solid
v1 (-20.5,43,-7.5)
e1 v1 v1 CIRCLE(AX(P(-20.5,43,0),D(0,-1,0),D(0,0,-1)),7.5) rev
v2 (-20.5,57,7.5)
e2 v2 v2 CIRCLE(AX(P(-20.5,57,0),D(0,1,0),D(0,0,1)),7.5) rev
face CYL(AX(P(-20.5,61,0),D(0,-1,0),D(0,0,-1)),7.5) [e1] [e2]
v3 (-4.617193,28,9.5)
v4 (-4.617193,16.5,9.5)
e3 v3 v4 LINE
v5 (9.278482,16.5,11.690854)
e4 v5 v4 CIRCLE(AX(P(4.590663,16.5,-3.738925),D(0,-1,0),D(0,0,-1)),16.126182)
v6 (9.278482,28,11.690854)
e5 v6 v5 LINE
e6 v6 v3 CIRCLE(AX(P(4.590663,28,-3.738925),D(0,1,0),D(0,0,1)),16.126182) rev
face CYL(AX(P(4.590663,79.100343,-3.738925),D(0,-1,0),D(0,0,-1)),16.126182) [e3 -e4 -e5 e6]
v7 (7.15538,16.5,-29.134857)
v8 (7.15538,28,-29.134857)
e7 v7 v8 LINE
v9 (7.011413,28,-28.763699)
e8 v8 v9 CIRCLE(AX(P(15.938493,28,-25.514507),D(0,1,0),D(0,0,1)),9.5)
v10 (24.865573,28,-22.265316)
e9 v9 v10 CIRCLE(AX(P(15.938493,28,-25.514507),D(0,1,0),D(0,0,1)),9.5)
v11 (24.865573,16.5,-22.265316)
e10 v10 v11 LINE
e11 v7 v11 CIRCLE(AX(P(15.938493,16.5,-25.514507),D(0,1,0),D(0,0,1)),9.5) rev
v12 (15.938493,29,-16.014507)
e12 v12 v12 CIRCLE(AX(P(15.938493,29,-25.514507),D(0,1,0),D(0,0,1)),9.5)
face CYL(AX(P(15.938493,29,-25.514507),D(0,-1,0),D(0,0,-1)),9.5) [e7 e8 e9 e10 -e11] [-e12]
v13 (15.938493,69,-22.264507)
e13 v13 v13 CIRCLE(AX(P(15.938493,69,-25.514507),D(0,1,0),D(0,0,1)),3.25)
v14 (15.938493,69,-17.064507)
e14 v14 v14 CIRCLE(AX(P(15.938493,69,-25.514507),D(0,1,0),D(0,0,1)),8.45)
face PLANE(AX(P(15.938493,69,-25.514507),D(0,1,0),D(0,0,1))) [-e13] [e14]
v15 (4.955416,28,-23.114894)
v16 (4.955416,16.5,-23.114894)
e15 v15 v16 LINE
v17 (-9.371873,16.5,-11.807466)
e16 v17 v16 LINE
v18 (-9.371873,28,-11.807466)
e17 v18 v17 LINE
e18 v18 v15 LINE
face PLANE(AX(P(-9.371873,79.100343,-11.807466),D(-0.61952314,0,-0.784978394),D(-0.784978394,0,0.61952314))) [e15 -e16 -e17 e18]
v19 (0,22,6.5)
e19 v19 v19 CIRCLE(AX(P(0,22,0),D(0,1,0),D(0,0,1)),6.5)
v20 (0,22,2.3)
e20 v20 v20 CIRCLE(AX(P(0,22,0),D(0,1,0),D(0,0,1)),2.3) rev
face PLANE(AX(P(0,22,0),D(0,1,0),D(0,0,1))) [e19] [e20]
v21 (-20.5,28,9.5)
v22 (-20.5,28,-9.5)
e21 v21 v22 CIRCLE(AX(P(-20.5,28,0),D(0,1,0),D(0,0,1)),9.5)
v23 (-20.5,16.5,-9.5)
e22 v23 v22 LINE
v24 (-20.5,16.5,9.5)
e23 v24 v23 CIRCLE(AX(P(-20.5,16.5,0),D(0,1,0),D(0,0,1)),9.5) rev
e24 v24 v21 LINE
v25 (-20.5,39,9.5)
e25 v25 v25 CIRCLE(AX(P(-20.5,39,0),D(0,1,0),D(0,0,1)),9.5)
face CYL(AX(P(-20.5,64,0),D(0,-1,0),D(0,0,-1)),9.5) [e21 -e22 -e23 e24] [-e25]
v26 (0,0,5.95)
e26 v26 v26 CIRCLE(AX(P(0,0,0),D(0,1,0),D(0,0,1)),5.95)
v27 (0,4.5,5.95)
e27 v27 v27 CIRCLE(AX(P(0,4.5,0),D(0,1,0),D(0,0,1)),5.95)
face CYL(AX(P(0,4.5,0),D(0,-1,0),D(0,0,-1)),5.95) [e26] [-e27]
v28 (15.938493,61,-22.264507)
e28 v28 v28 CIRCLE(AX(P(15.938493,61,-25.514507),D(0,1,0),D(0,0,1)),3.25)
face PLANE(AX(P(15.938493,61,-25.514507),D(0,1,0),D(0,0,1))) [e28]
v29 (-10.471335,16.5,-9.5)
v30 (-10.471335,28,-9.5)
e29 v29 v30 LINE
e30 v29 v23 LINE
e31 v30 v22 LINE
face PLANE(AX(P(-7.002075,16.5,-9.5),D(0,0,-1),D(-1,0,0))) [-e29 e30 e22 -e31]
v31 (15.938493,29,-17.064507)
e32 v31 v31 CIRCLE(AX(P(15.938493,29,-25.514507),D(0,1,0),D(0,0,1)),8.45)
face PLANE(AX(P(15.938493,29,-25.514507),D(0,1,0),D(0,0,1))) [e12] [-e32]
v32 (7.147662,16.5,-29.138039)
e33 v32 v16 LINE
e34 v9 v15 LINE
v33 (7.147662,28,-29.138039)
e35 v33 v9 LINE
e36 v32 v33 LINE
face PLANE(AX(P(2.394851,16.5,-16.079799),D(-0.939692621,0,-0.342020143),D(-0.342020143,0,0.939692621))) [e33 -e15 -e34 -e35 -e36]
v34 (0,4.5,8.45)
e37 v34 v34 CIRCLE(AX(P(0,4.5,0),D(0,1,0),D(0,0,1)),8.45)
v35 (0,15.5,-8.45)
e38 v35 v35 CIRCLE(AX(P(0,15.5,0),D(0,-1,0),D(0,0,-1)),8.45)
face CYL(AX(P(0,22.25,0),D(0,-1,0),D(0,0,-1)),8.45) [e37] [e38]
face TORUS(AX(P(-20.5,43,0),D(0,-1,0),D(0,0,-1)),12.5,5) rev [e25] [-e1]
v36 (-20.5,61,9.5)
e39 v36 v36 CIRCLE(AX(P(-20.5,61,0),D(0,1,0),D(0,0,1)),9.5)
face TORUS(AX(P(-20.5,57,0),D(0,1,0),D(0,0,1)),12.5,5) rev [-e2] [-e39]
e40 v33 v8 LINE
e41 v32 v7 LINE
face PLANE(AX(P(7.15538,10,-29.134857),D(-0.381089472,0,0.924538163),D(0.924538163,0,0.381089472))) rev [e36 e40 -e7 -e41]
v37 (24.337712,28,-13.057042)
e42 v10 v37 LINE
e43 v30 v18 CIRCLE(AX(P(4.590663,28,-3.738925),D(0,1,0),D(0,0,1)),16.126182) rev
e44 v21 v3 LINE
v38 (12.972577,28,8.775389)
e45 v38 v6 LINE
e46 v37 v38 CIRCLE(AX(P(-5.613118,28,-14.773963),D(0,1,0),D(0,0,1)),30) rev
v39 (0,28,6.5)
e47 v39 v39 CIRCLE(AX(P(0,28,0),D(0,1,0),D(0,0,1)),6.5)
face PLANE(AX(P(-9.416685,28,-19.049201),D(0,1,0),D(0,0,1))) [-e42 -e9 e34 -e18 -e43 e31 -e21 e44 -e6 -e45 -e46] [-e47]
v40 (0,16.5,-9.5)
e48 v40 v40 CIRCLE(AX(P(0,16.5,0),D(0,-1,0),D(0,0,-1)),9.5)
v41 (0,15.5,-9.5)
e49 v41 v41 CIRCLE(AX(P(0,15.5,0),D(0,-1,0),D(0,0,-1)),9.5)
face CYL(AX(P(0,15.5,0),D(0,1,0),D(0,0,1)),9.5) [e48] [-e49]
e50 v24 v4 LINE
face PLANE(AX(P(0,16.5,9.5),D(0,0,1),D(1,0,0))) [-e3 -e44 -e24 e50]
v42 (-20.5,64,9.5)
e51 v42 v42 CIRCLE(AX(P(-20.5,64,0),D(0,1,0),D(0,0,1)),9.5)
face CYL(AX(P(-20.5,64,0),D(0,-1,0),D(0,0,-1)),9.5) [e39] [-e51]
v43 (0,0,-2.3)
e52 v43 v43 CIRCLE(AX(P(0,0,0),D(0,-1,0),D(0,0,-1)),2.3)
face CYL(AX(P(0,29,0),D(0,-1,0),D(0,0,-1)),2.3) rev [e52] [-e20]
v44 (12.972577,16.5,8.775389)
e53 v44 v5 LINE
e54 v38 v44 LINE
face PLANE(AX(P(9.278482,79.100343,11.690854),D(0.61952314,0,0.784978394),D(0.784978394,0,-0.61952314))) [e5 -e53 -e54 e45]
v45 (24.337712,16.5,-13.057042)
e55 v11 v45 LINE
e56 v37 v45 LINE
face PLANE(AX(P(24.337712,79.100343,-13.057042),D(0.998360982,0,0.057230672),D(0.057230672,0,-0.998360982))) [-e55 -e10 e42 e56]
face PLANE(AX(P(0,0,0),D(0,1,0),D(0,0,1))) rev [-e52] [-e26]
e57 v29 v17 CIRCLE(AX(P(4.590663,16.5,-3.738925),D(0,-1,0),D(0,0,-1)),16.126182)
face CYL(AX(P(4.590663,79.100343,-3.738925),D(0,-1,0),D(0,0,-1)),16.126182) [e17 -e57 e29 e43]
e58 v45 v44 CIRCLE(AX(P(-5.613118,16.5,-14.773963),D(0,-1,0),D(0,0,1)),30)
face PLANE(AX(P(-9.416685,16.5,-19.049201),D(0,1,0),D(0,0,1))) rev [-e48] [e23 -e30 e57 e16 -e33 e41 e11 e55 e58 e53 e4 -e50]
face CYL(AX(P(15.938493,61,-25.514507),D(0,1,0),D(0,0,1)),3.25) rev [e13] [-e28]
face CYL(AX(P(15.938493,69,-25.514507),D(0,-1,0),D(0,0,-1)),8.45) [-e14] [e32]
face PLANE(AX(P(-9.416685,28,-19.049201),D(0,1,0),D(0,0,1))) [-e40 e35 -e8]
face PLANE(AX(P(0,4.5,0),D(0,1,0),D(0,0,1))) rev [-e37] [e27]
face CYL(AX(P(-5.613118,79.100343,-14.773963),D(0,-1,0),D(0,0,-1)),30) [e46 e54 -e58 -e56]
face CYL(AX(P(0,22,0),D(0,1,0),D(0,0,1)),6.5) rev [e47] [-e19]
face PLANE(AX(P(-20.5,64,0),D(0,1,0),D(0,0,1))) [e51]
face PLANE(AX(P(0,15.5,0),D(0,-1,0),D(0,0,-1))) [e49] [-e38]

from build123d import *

# Parameters (mm, degrees)
SKETCH_1_R           = 5.95
EXTRUDE_1_DEPTH      = 4.5
SKETCH_4_R           = 8.45
EXTRUDE_4_DEPTH      = 17.75
EXTRUDE_6_DEPTH      = 5.75
EXTRUDE_6_DEPTH_BACK = 5.75
SKETCH_12_R          = 9.5
EXTRUDE_10_DEPTH     = 1
SKETCH_7_R           = 2.3
CUT_EXTRUDE_1_DEPTH  = 57.22806055
SKETCH_8_R           = 6.5
CUT_EXTRUDE_2_DEPTH  = 6
SKETCH_9_R           = 9.5
EXTRUDE_7_DEPTH      = 36
SKETCH_10_R          = 8.45
EXTRUDE_8_DEPTH      = 40
EXTRUDE_START        = 1
SKETCH_13_R          = 9.5
SKETCH_13_R_2        = 2.3
EXTRUDE_11_DEPTH     = 1
SKETCH_14_R          = 3.25
CUT_EXTRUDE_3_DEPTH  = 8
CUT_EXTRUDE_START    = -18
CUT_EXTRUDE_4_DEPTH  = 18
CUT_EXTRUDE_START_2  = 11
SKETCH_16_R          = 14.956390748
SKETCH_16_R_2        = 7.5
CUT_EXTRUDE_5_DEPTH  = 22
FILLET_2_R           = 5
SKETCH_18_R          = 7.5
EXTRUDE_12_DEPTH     = 11.5


with BuildPart() as part:
    # Эскиз1 → Бобышка-Вытянуть1 (new body)
    with BuildSketch(Plane(origin=(0, 0, 0), x_dir=(1, 0, 0), z_dir=(0, 1, 0))):
        with Locations(Location((0, 0, 0), (0, 0, 270))):
            Circle(SKETCH_1_R)
    extrude(amount=EXTRUDE_1_DEPTH)

    # Эскиз4 → Бобышка-Вытянуть4 (add)
    with BuildSketch(Plane(origin=(0, 4.5, 0), x_dir=(1, 0, 0), z_dir=(0, 1, 0))):
        with Locations(Location((0, 0, 0), (0, 0, 270))):
            Circle(SKETCH_4_R)
    extrude(amount=EXTRUDE_4_DEPTH)

    # Эскиз6 → Бобышка-Вытянуть6 (add, two sides: drawn at the far end of the back side and taken through both)
    with BuildSketch(Plane(origin=(0, 22.25, 0), x_dir=(1, 0, 0), z_dir=(0, 1, 0)).offset(-EXTRUDE_6_DEPTH_BACK)):
        with BuildLine():
            Line((-7.002075382, 9.5), (-30, 9.5))
            Line((-30, 9.5), (-30, -9.5))
            Line((-30, -9.5), (0, -9.5))
            Line((0, -9.5), (0.833655922, -9.5))
            ThreePointArc((0.833655922, -9.5), (3.331132848, -9.18310947), (5.670324417, -8.252521801))
            ThreePointArc((5.670324417, -8.252521801), (13.556905273, -2.05094269), (19.066851837, 6.333461279))
            Line((19.066851837, 6.333461279), (28.114764095, 31.1923959))
            Line((28.114764095, 31.1923959), (10.2606043, 37.690778624))
            Line((10.2606043, 37.690778624), (2.394850826, 16.079798567))
            ThreePointArc((2.394850826, 16.079798567), (-1.266311019, 11.308479557), (-7.002075382, 9.5))
        make_face()
    extrude(amount=EXTRUDE_6_DEPTH + EXTRUDE_6_DEPTH_BACK)

    # Эскиз12 → Бобышка-Вытянуть10 (add)
    with BuildSketch(Plane(origin=(0, 28, 0), x_dir=(1, 0, 0), z_dir=(0, 1, 0))):
        with Locations(Location((15.938492836, 25.514507365, 0), (0, 0, 70))):
            Circle(SKETCH_12_R)
    extrude(amount=EXTRUDE_10_DEPTH)

    # Эскиз7 → Вырез-Вытянуть1 (cut, through all)
    with BuildSketch(Plane.XZ):
        with Locations(Location((0, 0, 0), (0, 0, 270))):
            Circle(SKETCH_7_R)
    extrude(amount=-CUT_EXTRUDE_1_DEPTH, mode=Mode.SUBTRACT)

    # Эскиз8 → Вырез-Вытянуть2 (cut)
    with BuildSketch(Plane(origin=(0, 28, 0), x_dir=(1, 0, 0), z_dir=(0, 1, 0))):
        with Locations(Location((0, 0, 0), (0, 0, 270))):
            Circle(SKETCH_8_R)
    extrude(amount=-CUT_EXTRUDE_2_DEPTH, mode=Mode.SUBTRACT)

    # Эскиз9 → Бобышка-Вытянуть7 (add)
    with BuildSketch(Plane.XZ.offset(-28)):
        with Locations(Location((-20.5, 0, 0), (0, 0, 90))):
            Circle(SKETCH_9_R)
    extrude(amount=-EXTRUDE_7_DEPTH)

    # Эскиз10 → Бобышка-Вытянуть8 (add)
    with BuildSketch(Plane(origin=(0, 29, 0), x_dir=(1, 0, 0), z_dir=(0, 1, 0))):
        with Locations(Location((15.938492836, 25.514507365, 0), (0, 0, 270))):
            Circle(SKETCH_10_R)
    extrude(amount=EXTRUDE_8_DEPTH)

    # Эскиз13 → Бобышка-Вытянуть11 (add)
    with BuildSketch(Plane.XZ.offset(-16.5).offset(EXTRUDE_START)):
        with Locations(Location((0, 0, 0), (0, 0, 90))):
            Circle(SKETCH_13_R)
        with Locations(Location((0, 0, 0), (0, 0, 270))):
            Circle(SKETCH_13_R_2, mode=Mode.SUBTRACT)
    extrude(amount=-EXTRUDE_11_DEPTH)

    # Эскиз14 → Вырез-Вытянуть3 (cut)
    with BuildSketch(Plane(origin=(0, 69, 0), x_dir=(1, 0, 0), z_dir=(0, 1, 0))):
        with Locations(Location((15.938492836, 25.514507365, 0), (0, 0, 270))):
            Circle(SKETCH_14_R)
    extrude(amount=-CUT_EXTRUDE_3_DEPTH, mode=Mode.SUBTRACT)

    # Эскиз15 → Вырез-Вытянуть4 (cut)
    with BuildSketch(Plane(origin=(0, 28, 0), x_dir=(1, 0, 0), z_dir=(0, 1, 0)).offset(CUT_EXTRUDE_START)):
        with BuildLine():
            Line((-20.5, 9.5), (-20.5, 16.947416375))
            Line((-20.5, 16.947416375), (-42.12929037, 16.947416375))
            Line((-42.12929037, 16.947416375), (-42.12929037, -12.742276146))
            Line((-42.12929037, -12.742276146), (-20.5, -12.742276146))
            Line((-20.5, -12.742276146), (-20.5, -9.5))
            ThreePointArc((-20.5, -9.5), (-30, 0), (-20.5, 9.5))
        make_face()
        with BuildLine():
            Line((7.155380289, 29.134857346), (-1.255186481, 32.601646037))
            Line((-1.255186481, 32.601646037), (4.631093303, 46.881994095))
            Line((4.631093303, 46.881994095), (38.784745505, 32.804049238))
            Line((38.784745505, 32.804049238), (32.89846572, 18.523701179))
            Line((32.89846572, 18.523701179), (24.721605383, 21.894157383))
            ThreePointArc((24.721605383, 21.894157383), (19.558842817, 34.297619911), (7.155380289, 29.134857346))
        make_face()
    extrude(amount=CUT_EXTRUDE_4_DEPTH, mode=Mode.SUBTRACT)

    # Эскиз16 → Вырез-Вытянуть5 (cut)
    with BuildSketch(Plane(origin=(0, 28, 0), x_dir=(1, 0, 0), z_dir=(0, 1, 0)).offset(CUT_EXTRUDE_START_2)):
        with Locations((-20.5, 0)):
            Circle(SKETCH_16_R)
        with Locations(Location((-20.5, 0, 0), (0, 0, 270))):
            Circle(SKETCH_16_R_2, mode=Mode.SUBTRACT)
    extrude(amount=CUT_EXTRUDE_5_DEPTH, mode=Mode.SUBTRACT)

    # Скругление2
    # the kernel refuses this fillet: 5 mm, written as the material it adds along each edge
    with BuildSketch(Plane(origin=(-20.5, 39, 0), x_dir=(0, 0, 1), z_dir=(-1, 0, 0))) as fillet_2_piece_1:
        with BuildLine():
            CenterArc((12.5, 4), FILLET_2_R, 180, 53.130102354)
            Line((7.5, 4), (7.4, 4))
            Line((7.4, 4), (7.4, 0))
            Line((7.4, 0), (7.5, -0.1))
            ThreePointArc((7.5, -0.1), (8.5, -0.1), (9.44, -0.08))
            Line((9.44, -0.08), (9.5, 0))
        make_face()
    revolve(axis=Axis((-20.5, 39, 0), (0, 1, 0)))
    with BuildSketch(Plane(origin=(-20.5, 61, 0), x_dir=(0, 0, 1), z_dir=(-1, 0, 0))) as fillet_2_piece_2:
        with BuildLine():
            CenterArc((12.5, -4), FILLET_2_R, 126.869897646, 53.130102354)
            Line((9.5, 0), (9.44, 0.08))
            ThreePointArc((9.44, 0.08), (8.5, 0.1), (7.5, 0.1))
            Line((7.5, 0.1), (7.4, 0))
            Line((7.4, 0), (7.4, -4))
            Line((7.4, -4), (7.5, -4))
        make_face()
    revolve(axis=Axis((-20.5, 61, 0), (0, 1, 0)))

    # Эскиз18 → Бобышка-Вытянуть12 (add)
    with BuildSketch(Plane.XZ.offset(-16.5)):
        with BuildLine():
            Line((9.278482036, 11.69085434), (12.972576627, 8.775389277))
            ThreePointArc((12.972576627, 8.775389277), (20.997261978, -0.921608959), (24.337711873, -13.057042378))
            Line((24.337711873, -13.057042378), (24.865572733, -22.265316003))
            Line((24.865572733, -22.265316003), (5.413533881, -23.476451416))
            Line((5.413533881, -23.476451416), (-9.371872764, -11.807465836))
            ThreePointArc((-9.371872764, -11.807465836), (-8.040562687, 6.286337643), (9.278482036, 11.69085434))
        make_face()
        Circle(SKETCH_18_R, mode=Mode.SUBTRACT)
    extrude(amount=-EXTRUDE_12_DEPTH)


solid = part.part
